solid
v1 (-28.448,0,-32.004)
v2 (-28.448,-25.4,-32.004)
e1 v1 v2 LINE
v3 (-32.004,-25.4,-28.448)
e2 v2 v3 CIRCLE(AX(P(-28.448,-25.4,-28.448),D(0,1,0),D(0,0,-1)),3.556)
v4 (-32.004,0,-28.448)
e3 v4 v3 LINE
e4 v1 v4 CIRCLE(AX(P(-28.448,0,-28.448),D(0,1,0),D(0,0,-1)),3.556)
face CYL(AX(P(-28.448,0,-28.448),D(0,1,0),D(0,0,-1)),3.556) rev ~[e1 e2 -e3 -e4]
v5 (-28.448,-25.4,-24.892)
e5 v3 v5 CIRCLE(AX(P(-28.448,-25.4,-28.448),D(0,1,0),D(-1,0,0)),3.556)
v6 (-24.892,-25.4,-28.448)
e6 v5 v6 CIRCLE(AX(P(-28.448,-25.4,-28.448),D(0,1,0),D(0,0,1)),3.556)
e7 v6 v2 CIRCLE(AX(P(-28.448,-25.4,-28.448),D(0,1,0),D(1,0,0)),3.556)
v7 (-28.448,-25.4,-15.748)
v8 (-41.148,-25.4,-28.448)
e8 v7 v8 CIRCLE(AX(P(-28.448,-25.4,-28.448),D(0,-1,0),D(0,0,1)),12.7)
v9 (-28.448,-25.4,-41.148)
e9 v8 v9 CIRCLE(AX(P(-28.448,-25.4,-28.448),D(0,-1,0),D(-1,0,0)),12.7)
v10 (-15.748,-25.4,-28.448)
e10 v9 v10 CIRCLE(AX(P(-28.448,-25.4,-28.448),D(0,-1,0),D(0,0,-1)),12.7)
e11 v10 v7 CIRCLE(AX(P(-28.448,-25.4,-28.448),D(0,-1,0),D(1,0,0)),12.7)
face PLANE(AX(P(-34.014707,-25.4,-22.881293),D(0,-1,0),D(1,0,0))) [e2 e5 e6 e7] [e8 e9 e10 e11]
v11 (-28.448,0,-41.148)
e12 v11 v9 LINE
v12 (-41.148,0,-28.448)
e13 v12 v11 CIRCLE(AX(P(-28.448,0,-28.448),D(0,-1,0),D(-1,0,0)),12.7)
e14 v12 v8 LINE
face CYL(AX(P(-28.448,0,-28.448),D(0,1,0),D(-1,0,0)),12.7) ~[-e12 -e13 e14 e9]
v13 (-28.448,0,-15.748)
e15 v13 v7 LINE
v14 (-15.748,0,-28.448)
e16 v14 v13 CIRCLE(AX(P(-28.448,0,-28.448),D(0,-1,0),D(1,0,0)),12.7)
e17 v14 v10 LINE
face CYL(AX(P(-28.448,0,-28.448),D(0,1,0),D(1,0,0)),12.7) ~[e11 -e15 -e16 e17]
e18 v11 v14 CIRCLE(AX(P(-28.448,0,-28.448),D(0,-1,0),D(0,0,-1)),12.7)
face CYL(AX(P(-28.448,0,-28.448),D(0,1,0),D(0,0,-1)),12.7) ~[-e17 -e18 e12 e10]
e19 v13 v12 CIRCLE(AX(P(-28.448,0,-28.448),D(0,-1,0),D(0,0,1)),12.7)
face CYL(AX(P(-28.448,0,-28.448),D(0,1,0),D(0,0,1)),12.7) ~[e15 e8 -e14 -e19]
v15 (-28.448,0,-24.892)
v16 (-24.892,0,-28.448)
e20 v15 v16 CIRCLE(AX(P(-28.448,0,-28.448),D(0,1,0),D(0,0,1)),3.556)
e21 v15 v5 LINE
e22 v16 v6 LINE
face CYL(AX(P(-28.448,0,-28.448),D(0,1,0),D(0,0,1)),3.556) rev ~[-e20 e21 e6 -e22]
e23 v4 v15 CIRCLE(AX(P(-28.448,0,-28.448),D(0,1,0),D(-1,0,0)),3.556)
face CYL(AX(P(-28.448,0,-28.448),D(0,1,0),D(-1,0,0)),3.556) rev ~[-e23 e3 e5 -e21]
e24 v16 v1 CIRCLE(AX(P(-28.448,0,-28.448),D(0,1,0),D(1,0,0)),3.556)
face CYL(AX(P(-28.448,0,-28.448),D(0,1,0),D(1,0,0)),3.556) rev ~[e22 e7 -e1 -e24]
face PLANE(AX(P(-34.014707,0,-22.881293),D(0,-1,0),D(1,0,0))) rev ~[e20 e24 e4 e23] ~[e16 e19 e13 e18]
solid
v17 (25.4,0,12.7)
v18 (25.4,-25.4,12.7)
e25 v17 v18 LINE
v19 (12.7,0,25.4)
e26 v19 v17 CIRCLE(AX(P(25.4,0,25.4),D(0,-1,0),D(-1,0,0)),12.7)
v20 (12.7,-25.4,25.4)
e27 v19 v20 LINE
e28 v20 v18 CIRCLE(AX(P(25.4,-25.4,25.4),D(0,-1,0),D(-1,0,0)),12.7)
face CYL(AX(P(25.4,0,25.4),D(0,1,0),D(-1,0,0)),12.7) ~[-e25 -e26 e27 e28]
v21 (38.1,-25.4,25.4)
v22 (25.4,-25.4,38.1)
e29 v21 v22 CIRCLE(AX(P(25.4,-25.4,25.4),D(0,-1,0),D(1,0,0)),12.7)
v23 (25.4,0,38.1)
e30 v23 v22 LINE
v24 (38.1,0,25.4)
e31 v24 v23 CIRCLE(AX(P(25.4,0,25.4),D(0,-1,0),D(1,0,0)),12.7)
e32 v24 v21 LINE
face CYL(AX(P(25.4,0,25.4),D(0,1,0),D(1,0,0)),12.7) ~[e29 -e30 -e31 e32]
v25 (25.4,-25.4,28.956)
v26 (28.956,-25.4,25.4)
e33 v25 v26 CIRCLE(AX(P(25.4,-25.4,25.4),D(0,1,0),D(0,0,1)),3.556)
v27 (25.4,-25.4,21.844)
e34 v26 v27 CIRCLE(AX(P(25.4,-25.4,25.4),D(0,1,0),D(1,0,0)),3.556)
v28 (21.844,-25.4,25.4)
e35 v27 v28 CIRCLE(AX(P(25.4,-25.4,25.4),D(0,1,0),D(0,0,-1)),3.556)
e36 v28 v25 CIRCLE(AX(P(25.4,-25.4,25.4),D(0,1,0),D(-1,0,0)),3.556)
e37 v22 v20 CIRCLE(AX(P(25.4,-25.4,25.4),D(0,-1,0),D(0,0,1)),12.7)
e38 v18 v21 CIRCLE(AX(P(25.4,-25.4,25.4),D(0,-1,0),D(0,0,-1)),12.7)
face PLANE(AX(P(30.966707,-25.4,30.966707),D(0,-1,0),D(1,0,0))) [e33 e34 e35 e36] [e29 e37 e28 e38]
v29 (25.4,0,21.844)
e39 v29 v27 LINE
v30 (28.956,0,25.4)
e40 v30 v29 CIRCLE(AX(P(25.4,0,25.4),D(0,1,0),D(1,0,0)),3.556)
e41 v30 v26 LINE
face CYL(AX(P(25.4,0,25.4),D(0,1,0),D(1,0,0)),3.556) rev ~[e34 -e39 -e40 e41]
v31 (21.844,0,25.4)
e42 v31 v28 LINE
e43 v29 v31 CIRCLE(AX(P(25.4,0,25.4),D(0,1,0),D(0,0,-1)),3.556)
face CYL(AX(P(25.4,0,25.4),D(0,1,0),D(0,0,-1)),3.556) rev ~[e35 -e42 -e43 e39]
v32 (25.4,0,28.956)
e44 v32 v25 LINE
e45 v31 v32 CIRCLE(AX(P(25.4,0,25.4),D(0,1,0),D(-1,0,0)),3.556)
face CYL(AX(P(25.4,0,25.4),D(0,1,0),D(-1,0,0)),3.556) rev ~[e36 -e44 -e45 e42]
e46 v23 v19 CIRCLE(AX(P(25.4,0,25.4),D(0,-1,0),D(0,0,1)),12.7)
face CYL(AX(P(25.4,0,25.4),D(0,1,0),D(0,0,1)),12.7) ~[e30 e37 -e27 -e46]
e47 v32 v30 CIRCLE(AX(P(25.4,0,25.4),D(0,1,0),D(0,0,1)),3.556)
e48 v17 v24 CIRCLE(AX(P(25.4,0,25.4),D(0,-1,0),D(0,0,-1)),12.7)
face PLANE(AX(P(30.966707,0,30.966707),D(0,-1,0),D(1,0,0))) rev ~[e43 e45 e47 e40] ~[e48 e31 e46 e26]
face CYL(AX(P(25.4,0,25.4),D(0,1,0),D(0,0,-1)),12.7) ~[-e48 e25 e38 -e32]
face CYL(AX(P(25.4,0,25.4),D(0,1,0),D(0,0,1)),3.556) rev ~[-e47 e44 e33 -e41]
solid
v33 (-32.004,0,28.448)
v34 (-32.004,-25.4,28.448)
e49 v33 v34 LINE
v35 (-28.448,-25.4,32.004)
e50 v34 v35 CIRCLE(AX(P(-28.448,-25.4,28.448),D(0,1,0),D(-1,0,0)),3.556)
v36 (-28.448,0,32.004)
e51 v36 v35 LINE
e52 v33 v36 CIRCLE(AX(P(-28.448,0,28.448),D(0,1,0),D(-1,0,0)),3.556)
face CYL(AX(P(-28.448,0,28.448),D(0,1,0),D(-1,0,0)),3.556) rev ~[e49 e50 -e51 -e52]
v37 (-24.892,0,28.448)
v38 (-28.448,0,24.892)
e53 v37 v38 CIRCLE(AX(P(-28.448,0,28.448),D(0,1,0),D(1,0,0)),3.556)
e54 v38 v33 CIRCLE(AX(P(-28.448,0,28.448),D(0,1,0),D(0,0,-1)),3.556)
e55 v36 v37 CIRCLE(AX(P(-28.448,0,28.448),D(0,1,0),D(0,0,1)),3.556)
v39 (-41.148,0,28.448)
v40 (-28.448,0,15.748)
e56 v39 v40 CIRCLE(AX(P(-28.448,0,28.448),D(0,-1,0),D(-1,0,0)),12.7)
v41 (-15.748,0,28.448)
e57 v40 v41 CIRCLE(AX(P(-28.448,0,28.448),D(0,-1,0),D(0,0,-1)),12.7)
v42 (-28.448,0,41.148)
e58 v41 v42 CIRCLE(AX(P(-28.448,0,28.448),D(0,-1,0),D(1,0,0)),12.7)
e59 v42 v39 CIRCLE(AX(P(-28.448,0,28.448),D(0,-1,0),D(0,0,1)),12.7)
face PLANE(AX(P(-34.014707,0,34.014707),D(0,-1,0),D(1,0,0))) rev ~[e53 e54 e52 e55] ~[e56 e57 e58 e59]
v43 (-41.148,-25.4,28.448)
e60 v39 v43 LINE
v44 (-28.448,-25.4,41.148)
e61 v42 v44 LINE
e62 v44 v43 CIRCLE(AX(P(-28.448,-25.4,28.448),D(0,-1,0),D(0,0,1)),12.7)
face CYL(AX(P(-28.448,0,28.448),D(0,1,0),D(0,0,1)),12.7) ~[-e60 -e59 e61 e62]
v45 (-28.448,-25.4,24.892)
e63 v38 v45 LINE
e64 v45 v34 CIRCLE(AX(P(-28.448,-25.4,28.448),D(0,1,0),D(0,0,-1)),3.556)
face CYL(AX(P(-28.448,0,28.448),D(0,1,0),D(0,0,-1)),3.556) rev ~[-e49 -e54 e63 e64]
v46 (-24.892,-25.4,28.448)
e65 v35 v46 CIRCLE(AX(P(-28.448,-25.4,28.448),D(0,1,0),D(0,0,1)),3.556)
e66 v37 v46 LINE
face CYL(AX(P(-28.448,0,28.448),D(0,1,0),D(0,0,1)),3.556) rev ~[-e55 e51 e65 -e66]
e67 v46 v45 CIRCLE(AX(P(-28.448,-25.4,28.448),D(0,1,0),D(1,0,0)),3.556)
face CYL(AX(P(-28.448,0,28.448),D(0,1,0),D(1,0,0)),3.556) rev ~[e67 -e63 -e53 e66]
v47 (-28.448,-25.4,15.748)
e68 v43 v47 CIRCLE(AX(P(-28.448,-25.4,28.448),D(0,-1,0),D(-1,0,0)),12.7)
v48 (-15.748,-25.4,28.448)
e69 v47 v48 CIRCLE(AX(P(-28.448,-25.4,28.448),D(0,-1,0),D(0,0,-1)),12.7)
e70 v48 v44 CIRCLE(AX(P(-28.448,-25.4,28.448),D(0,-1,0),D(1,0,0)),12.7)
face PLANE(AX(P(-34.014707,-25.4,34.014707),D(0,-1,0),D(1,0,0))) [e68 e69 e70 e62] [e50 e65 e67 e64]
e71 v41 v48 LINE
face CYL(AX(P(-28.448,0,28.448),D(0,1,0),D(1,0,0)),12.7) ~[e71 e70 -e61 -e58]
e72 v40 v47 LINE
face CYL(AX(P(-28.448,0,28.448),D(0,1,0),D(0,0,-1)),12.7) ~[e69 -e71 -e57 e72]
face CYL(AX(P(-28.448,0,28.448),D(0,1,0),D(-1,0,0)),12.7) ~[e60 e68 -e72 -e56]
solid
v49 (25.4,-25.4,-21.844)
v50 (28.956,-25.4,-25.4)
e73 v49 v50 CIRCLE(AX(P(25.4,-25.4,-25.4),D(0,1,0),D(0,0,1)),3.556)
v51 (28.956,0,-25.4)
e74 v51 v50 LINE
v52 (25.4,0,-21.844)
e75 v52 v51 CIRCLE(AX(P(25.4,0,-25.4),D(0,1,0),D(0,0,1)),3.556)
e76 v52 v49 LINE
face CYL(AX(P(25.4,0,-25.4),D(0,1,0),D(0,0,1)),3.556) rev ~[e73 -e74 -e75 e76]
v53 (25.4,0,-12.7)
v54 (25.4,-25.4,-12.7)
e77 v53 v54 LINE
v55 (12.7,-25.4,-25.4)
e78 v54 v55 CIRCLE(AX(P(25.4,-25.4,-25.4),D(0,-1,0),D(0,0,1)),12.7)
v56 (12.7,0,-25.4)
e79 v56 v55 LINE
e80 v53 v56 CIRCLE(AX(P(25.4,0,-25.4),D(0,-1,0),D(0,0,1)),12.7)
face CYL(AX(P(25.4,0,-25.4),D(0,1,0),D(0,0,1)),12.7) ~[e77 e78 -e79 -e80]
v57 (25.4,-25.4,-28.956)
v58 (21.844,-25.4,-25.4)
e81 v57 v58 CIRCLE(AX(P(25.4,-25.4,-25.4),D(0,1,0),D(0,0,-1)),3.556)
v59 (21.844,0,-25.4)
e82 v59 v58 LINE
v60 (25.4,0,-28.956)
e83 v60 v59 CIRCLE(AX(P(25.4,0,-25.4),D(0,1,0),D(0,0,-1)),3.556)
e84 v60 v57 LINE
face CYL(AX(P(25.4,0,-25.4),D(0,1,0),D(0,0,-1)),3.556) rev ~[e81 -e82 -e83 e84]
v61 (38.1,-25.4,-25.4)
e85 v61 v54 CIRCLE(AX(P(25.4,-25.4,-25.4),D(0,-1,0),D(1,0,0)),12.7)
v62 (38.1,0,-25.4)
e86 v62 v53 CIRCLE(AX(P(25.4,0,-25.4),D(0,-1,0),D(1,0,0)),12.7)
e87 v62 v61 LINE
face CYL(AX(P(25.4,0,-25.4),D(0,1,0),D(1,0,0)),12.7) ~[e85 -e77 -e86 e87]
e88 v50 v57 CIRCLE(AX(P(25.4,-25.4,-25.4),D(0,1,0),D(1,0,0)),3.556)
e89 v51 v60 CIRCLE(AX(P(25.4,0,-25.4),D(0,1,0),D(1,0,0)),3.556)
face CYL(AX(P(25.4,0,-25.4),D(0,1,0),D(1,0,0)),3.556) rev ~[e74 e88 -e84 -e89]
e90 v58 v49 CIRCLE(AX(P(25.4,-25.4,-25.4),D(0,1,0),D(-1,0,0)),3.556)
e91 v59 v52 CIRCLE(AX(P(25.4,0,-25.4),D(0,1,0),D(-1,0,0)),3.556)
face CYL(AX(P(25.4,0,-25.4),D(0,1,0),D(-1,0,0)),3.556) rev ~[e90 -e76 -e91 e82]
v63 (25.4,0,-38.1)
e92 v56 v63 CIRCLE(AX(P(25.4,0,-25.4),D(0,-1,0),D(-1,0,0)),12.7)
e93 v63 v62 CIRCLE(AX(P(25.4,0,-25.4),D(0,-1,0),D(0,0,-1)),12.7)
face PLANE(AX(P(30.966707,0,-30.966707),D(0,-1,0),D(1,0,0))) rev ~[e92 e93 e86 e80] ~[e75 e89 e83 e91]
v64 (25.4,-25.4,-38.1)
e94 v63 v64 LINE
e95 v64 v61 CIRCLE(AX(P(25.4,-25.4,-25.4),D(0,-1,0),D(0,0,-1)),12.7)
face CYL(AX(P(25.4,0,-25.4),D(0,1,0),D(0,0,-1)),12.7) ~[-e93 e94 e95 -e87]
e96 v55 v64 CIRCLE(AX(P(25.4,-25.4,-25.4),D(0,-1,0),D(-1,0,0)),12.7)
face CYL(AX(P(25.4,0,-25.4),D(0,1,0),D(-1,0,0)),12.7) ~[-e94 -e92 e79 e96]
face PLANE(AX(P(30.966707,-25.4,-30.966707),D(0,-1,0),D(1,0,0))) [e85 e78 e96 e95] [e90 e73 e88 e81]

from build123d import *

# Parameters (mm, degrees)
F1_DEPTH = 25.4
F3_DEPTH = 25.4
F5_DEPTH = 25.4
F7_DEPTH = 25.4


# Not quite as in the source:
# - a feature names something its author has since deleted; it is built from what else it names


with BuildPart() as f1:
    # F0 (on Front) → F1 (new body)
    with BuildSketch(Plane.XZ):
        with BuildLine():
            Line((28.956, 25.4), (38.1, 25.4))
            ThreePointArc((38.1, 25.4), (34.3802561211, 34.3802561211), (25.4, 38.1))
            Line((25.4, 38.1), (25.4, 28.956))
            ThreePointArc((25.4, 28.956), (27.9144717139, 27.9144717139), (28.956, 25.4))
        make_face()
        with BuildLine():
            ThreePointArc((25.4, 38.1), (16.4197438789, 34.3802561211), (12.7, 25.4))
            Line((12.7, 25.4), (21.844, 25.4))
            ThreePointArc((21.844, 25.4), (22.8855282861, 27.9144717139), (25.4, 28.956))
            Line((25.4, 28.956), (25.4, 38.1))
        make_face()
        with BuildLine():
            ThreePointArc((12.7, 25.4), (16.4197438789, 16.4197438789), (25.4, 12.7))
            Line((25.4, 12.7), (25.4, 21.844))
            ThreePointArc((25.4, 21.844), (22.8855282861, 22.8855282861), (21.844, 25.4))
            Line((21.844, 25.4), (12.7, 25.4))
        make_face()
        with BuildLine():
            Line((25.4, 21.844), (25.4, 12.7))
            ThreePointArc((25.4, 12.7), (34.3802561211, 16.4197438789), (38.1, 25.4))
            Line((38.1, 25.4), (28.956, 25.4))
            ThreePointArc((28.956, 25.4), (27.9144717139, 22.8855282861), (25.4, 21.844))
        make_face()
    extrude(amount=F1_DEPTH)


with BuildPart() as f3:
    # F2 (on Front) → F3 (new body)
    with BuildSketch(Plane.XZ):
        with BuildLine():
            ThreePointArc((25.4, -38.1), (34.3802561211, -34.3802561211), (38.1, -25.4))
            Line((38.1, -25.4), (28.956, -25.4))
            ThreePointArc((28.956, -25.4), (27.9144717139, -27.9144717139), (25.4, -28.956))
            Line((25.4, -28.956), (25.4, -38.1))
        make_face()
        with BuildLine():
            Line((21.844, -25.4), (12.7, -25.4))
            ThreePointArc((12.7, -25.4), (16.4197438789, -34.3802561211), (25.4, -38.1))
            Line((25.4, -38.1), (25.4, -28.956))
            ThreePointArc((25.4, -28.956), (22.8855282861, -27.9144717139), (21.844, -25.4))
        make_face()
        with BuildLine():
            Line((25.4, -21.844), (25.4, -12.7))
            ThreePointArc((25.4, -12.7), (16.4197438789, -16.4197438789), (12.7, -25.4))
            Line((12.7, -25.4), (21.844, -25.4))
            ThreePointArc((21.844, -25.4), (22.8855282861, -22.8855282861), (25.4, -21.844))
        make_face()
        with BuildLine():
            ThreePointArc((38.1, -25.4), (34.3802561211, -16.4197438789), (25.4, -12.7))
            Line((25.4, -12.7), (25.4, -21.844))
            ThreePointArc((25.4, -21.844), (27.9144717139, -22.8855282861), (28.956, -25.4))
            Line((28.956, -25.4), (38.1, -25.4))
        make_face()
    extrude(amount=F3_DEPTH)


with BuildPart() as f5:
    # F4 (on Front) → F5 (new body)
    with BuildSketch(Plane.XZ):
        with BuildLine():
            ThreePointArc((-28.448, 41.148), (-37.4282561211, 37.4282561211), (-41.148, 28.448))
            Line((-41.148, 28.448), (-32.004, 28.448))
            ThreePointArc((-32.004, 28.448), (-30.9624717139, 30.9624717139), (-28.448, 32.004))
            Line((-28.448, 32.004), (-28.448, 41.148))
        make_face()
        with BuildLine():
            Line((-24.892, 28.448), (-15.748, 28.448))
            ThreePointArc((-15.748, 28.448), (-19.4677438789, 37.4282561211), (-28.448, 41.148))
            Line((-28.448, 41.148), (-28.448, 32.004))
            ThreePointArc((-28.448, 32.004), (-25.9335282861, 30.9624717139), (-24.892, 28.448))
        make_face()
        with BuildLine():
            Line((-28.448, 24.892), (-28.448, 15.748))
            ThreePointArc((-28.448, 15.748), (-19.4677438789, 19.4677438789), (-15.748, 28.448))
            Line((-15.748, 28.448), (-24.892, 28.448))
            ThreePointArc((-24.892, 28.448), (-25.9335282861, 25.9335282861), (-28.448, 24.892))
        make_face()
        with BuildLine():
            ThreePointArc((-41.148, 28.448), (-37.4282561211, 19.4677438789), (-28.448, 15.748))
            Line((-28.448, 15.748), (-28.448, 24.892))
            ThreePointArc((-28.448, 24.892), (-30.9624717139, 25.9335282861), (-32.004, 28.448))
            Line((-32.004, 28.448), (-41.148, 28.448))
        make_face()
    extrude(amount=F5_DEPTH)


with BuildPart() as f7:
    # F6 (on Front) → F7 (new body)
    with BuildSketch(Plane.XZ):
        with BuildLine():
            Line((-28.448, -24.892), (-28.448, -15.748))
            ThreePointArc((-28.448, -15.748), (-37.4282561211, -19.4677438789), (-41.148, -28.448))
            Line((-41.148, -28.448), (-32.004, -28.448))
            ThreePointArc((-32.004, -28.448), (-30.9624717139, -25.9335282861), (-28.448, -24.892))
        make_face()
        with BuildLine():
            Line((-24.892, -28.448), (-15.748, -28.448))
            ThreePointArc((-15.748, -28.448), (-19.4677438789, -19.4677438789), (-28.448, -15.748))
            Line((-28.448, -15.748), (-28.448, -24.892))
            ThreePointArc((-28.448, -24.892), (-25.9335282861, -25.9335282861), (-24.892, -28.448))
        make_face()
        with BuildLine():
            ThreePointArc((-28.448, -41.148), (-19.4677438789, -37.4282561211), (-15.748, -28.448))
            Line((-15.748, -28.448), (-24.892, -28.448))
            ThreePointArc((-24.892, -28.448), (-25.9335282861, -30.9624717139), (-28.448, -32.004))
            Line((-28.448, -32.004), (-28.448, -41.148))
        make_face()
        with BuildLine():
            ThreePointArc((-41.148, -28.448), (-37.4282561211, -37.4282561211), (-28.448, -41.148))
            Line((-28.448, -41.148), (-28.448, -32.004))
            ThreePointArc((-28.448, -32.004), (-30.9624717139, -30.9624717139), (-32.004, -28.448))
            Line((-32.004, -28.448), (-41.148, -28.448))
        make_face()
    extrude(amount=F7_DEPTH)


solid = Compound([f1.part, f3.part, f5.part, f7.part])
